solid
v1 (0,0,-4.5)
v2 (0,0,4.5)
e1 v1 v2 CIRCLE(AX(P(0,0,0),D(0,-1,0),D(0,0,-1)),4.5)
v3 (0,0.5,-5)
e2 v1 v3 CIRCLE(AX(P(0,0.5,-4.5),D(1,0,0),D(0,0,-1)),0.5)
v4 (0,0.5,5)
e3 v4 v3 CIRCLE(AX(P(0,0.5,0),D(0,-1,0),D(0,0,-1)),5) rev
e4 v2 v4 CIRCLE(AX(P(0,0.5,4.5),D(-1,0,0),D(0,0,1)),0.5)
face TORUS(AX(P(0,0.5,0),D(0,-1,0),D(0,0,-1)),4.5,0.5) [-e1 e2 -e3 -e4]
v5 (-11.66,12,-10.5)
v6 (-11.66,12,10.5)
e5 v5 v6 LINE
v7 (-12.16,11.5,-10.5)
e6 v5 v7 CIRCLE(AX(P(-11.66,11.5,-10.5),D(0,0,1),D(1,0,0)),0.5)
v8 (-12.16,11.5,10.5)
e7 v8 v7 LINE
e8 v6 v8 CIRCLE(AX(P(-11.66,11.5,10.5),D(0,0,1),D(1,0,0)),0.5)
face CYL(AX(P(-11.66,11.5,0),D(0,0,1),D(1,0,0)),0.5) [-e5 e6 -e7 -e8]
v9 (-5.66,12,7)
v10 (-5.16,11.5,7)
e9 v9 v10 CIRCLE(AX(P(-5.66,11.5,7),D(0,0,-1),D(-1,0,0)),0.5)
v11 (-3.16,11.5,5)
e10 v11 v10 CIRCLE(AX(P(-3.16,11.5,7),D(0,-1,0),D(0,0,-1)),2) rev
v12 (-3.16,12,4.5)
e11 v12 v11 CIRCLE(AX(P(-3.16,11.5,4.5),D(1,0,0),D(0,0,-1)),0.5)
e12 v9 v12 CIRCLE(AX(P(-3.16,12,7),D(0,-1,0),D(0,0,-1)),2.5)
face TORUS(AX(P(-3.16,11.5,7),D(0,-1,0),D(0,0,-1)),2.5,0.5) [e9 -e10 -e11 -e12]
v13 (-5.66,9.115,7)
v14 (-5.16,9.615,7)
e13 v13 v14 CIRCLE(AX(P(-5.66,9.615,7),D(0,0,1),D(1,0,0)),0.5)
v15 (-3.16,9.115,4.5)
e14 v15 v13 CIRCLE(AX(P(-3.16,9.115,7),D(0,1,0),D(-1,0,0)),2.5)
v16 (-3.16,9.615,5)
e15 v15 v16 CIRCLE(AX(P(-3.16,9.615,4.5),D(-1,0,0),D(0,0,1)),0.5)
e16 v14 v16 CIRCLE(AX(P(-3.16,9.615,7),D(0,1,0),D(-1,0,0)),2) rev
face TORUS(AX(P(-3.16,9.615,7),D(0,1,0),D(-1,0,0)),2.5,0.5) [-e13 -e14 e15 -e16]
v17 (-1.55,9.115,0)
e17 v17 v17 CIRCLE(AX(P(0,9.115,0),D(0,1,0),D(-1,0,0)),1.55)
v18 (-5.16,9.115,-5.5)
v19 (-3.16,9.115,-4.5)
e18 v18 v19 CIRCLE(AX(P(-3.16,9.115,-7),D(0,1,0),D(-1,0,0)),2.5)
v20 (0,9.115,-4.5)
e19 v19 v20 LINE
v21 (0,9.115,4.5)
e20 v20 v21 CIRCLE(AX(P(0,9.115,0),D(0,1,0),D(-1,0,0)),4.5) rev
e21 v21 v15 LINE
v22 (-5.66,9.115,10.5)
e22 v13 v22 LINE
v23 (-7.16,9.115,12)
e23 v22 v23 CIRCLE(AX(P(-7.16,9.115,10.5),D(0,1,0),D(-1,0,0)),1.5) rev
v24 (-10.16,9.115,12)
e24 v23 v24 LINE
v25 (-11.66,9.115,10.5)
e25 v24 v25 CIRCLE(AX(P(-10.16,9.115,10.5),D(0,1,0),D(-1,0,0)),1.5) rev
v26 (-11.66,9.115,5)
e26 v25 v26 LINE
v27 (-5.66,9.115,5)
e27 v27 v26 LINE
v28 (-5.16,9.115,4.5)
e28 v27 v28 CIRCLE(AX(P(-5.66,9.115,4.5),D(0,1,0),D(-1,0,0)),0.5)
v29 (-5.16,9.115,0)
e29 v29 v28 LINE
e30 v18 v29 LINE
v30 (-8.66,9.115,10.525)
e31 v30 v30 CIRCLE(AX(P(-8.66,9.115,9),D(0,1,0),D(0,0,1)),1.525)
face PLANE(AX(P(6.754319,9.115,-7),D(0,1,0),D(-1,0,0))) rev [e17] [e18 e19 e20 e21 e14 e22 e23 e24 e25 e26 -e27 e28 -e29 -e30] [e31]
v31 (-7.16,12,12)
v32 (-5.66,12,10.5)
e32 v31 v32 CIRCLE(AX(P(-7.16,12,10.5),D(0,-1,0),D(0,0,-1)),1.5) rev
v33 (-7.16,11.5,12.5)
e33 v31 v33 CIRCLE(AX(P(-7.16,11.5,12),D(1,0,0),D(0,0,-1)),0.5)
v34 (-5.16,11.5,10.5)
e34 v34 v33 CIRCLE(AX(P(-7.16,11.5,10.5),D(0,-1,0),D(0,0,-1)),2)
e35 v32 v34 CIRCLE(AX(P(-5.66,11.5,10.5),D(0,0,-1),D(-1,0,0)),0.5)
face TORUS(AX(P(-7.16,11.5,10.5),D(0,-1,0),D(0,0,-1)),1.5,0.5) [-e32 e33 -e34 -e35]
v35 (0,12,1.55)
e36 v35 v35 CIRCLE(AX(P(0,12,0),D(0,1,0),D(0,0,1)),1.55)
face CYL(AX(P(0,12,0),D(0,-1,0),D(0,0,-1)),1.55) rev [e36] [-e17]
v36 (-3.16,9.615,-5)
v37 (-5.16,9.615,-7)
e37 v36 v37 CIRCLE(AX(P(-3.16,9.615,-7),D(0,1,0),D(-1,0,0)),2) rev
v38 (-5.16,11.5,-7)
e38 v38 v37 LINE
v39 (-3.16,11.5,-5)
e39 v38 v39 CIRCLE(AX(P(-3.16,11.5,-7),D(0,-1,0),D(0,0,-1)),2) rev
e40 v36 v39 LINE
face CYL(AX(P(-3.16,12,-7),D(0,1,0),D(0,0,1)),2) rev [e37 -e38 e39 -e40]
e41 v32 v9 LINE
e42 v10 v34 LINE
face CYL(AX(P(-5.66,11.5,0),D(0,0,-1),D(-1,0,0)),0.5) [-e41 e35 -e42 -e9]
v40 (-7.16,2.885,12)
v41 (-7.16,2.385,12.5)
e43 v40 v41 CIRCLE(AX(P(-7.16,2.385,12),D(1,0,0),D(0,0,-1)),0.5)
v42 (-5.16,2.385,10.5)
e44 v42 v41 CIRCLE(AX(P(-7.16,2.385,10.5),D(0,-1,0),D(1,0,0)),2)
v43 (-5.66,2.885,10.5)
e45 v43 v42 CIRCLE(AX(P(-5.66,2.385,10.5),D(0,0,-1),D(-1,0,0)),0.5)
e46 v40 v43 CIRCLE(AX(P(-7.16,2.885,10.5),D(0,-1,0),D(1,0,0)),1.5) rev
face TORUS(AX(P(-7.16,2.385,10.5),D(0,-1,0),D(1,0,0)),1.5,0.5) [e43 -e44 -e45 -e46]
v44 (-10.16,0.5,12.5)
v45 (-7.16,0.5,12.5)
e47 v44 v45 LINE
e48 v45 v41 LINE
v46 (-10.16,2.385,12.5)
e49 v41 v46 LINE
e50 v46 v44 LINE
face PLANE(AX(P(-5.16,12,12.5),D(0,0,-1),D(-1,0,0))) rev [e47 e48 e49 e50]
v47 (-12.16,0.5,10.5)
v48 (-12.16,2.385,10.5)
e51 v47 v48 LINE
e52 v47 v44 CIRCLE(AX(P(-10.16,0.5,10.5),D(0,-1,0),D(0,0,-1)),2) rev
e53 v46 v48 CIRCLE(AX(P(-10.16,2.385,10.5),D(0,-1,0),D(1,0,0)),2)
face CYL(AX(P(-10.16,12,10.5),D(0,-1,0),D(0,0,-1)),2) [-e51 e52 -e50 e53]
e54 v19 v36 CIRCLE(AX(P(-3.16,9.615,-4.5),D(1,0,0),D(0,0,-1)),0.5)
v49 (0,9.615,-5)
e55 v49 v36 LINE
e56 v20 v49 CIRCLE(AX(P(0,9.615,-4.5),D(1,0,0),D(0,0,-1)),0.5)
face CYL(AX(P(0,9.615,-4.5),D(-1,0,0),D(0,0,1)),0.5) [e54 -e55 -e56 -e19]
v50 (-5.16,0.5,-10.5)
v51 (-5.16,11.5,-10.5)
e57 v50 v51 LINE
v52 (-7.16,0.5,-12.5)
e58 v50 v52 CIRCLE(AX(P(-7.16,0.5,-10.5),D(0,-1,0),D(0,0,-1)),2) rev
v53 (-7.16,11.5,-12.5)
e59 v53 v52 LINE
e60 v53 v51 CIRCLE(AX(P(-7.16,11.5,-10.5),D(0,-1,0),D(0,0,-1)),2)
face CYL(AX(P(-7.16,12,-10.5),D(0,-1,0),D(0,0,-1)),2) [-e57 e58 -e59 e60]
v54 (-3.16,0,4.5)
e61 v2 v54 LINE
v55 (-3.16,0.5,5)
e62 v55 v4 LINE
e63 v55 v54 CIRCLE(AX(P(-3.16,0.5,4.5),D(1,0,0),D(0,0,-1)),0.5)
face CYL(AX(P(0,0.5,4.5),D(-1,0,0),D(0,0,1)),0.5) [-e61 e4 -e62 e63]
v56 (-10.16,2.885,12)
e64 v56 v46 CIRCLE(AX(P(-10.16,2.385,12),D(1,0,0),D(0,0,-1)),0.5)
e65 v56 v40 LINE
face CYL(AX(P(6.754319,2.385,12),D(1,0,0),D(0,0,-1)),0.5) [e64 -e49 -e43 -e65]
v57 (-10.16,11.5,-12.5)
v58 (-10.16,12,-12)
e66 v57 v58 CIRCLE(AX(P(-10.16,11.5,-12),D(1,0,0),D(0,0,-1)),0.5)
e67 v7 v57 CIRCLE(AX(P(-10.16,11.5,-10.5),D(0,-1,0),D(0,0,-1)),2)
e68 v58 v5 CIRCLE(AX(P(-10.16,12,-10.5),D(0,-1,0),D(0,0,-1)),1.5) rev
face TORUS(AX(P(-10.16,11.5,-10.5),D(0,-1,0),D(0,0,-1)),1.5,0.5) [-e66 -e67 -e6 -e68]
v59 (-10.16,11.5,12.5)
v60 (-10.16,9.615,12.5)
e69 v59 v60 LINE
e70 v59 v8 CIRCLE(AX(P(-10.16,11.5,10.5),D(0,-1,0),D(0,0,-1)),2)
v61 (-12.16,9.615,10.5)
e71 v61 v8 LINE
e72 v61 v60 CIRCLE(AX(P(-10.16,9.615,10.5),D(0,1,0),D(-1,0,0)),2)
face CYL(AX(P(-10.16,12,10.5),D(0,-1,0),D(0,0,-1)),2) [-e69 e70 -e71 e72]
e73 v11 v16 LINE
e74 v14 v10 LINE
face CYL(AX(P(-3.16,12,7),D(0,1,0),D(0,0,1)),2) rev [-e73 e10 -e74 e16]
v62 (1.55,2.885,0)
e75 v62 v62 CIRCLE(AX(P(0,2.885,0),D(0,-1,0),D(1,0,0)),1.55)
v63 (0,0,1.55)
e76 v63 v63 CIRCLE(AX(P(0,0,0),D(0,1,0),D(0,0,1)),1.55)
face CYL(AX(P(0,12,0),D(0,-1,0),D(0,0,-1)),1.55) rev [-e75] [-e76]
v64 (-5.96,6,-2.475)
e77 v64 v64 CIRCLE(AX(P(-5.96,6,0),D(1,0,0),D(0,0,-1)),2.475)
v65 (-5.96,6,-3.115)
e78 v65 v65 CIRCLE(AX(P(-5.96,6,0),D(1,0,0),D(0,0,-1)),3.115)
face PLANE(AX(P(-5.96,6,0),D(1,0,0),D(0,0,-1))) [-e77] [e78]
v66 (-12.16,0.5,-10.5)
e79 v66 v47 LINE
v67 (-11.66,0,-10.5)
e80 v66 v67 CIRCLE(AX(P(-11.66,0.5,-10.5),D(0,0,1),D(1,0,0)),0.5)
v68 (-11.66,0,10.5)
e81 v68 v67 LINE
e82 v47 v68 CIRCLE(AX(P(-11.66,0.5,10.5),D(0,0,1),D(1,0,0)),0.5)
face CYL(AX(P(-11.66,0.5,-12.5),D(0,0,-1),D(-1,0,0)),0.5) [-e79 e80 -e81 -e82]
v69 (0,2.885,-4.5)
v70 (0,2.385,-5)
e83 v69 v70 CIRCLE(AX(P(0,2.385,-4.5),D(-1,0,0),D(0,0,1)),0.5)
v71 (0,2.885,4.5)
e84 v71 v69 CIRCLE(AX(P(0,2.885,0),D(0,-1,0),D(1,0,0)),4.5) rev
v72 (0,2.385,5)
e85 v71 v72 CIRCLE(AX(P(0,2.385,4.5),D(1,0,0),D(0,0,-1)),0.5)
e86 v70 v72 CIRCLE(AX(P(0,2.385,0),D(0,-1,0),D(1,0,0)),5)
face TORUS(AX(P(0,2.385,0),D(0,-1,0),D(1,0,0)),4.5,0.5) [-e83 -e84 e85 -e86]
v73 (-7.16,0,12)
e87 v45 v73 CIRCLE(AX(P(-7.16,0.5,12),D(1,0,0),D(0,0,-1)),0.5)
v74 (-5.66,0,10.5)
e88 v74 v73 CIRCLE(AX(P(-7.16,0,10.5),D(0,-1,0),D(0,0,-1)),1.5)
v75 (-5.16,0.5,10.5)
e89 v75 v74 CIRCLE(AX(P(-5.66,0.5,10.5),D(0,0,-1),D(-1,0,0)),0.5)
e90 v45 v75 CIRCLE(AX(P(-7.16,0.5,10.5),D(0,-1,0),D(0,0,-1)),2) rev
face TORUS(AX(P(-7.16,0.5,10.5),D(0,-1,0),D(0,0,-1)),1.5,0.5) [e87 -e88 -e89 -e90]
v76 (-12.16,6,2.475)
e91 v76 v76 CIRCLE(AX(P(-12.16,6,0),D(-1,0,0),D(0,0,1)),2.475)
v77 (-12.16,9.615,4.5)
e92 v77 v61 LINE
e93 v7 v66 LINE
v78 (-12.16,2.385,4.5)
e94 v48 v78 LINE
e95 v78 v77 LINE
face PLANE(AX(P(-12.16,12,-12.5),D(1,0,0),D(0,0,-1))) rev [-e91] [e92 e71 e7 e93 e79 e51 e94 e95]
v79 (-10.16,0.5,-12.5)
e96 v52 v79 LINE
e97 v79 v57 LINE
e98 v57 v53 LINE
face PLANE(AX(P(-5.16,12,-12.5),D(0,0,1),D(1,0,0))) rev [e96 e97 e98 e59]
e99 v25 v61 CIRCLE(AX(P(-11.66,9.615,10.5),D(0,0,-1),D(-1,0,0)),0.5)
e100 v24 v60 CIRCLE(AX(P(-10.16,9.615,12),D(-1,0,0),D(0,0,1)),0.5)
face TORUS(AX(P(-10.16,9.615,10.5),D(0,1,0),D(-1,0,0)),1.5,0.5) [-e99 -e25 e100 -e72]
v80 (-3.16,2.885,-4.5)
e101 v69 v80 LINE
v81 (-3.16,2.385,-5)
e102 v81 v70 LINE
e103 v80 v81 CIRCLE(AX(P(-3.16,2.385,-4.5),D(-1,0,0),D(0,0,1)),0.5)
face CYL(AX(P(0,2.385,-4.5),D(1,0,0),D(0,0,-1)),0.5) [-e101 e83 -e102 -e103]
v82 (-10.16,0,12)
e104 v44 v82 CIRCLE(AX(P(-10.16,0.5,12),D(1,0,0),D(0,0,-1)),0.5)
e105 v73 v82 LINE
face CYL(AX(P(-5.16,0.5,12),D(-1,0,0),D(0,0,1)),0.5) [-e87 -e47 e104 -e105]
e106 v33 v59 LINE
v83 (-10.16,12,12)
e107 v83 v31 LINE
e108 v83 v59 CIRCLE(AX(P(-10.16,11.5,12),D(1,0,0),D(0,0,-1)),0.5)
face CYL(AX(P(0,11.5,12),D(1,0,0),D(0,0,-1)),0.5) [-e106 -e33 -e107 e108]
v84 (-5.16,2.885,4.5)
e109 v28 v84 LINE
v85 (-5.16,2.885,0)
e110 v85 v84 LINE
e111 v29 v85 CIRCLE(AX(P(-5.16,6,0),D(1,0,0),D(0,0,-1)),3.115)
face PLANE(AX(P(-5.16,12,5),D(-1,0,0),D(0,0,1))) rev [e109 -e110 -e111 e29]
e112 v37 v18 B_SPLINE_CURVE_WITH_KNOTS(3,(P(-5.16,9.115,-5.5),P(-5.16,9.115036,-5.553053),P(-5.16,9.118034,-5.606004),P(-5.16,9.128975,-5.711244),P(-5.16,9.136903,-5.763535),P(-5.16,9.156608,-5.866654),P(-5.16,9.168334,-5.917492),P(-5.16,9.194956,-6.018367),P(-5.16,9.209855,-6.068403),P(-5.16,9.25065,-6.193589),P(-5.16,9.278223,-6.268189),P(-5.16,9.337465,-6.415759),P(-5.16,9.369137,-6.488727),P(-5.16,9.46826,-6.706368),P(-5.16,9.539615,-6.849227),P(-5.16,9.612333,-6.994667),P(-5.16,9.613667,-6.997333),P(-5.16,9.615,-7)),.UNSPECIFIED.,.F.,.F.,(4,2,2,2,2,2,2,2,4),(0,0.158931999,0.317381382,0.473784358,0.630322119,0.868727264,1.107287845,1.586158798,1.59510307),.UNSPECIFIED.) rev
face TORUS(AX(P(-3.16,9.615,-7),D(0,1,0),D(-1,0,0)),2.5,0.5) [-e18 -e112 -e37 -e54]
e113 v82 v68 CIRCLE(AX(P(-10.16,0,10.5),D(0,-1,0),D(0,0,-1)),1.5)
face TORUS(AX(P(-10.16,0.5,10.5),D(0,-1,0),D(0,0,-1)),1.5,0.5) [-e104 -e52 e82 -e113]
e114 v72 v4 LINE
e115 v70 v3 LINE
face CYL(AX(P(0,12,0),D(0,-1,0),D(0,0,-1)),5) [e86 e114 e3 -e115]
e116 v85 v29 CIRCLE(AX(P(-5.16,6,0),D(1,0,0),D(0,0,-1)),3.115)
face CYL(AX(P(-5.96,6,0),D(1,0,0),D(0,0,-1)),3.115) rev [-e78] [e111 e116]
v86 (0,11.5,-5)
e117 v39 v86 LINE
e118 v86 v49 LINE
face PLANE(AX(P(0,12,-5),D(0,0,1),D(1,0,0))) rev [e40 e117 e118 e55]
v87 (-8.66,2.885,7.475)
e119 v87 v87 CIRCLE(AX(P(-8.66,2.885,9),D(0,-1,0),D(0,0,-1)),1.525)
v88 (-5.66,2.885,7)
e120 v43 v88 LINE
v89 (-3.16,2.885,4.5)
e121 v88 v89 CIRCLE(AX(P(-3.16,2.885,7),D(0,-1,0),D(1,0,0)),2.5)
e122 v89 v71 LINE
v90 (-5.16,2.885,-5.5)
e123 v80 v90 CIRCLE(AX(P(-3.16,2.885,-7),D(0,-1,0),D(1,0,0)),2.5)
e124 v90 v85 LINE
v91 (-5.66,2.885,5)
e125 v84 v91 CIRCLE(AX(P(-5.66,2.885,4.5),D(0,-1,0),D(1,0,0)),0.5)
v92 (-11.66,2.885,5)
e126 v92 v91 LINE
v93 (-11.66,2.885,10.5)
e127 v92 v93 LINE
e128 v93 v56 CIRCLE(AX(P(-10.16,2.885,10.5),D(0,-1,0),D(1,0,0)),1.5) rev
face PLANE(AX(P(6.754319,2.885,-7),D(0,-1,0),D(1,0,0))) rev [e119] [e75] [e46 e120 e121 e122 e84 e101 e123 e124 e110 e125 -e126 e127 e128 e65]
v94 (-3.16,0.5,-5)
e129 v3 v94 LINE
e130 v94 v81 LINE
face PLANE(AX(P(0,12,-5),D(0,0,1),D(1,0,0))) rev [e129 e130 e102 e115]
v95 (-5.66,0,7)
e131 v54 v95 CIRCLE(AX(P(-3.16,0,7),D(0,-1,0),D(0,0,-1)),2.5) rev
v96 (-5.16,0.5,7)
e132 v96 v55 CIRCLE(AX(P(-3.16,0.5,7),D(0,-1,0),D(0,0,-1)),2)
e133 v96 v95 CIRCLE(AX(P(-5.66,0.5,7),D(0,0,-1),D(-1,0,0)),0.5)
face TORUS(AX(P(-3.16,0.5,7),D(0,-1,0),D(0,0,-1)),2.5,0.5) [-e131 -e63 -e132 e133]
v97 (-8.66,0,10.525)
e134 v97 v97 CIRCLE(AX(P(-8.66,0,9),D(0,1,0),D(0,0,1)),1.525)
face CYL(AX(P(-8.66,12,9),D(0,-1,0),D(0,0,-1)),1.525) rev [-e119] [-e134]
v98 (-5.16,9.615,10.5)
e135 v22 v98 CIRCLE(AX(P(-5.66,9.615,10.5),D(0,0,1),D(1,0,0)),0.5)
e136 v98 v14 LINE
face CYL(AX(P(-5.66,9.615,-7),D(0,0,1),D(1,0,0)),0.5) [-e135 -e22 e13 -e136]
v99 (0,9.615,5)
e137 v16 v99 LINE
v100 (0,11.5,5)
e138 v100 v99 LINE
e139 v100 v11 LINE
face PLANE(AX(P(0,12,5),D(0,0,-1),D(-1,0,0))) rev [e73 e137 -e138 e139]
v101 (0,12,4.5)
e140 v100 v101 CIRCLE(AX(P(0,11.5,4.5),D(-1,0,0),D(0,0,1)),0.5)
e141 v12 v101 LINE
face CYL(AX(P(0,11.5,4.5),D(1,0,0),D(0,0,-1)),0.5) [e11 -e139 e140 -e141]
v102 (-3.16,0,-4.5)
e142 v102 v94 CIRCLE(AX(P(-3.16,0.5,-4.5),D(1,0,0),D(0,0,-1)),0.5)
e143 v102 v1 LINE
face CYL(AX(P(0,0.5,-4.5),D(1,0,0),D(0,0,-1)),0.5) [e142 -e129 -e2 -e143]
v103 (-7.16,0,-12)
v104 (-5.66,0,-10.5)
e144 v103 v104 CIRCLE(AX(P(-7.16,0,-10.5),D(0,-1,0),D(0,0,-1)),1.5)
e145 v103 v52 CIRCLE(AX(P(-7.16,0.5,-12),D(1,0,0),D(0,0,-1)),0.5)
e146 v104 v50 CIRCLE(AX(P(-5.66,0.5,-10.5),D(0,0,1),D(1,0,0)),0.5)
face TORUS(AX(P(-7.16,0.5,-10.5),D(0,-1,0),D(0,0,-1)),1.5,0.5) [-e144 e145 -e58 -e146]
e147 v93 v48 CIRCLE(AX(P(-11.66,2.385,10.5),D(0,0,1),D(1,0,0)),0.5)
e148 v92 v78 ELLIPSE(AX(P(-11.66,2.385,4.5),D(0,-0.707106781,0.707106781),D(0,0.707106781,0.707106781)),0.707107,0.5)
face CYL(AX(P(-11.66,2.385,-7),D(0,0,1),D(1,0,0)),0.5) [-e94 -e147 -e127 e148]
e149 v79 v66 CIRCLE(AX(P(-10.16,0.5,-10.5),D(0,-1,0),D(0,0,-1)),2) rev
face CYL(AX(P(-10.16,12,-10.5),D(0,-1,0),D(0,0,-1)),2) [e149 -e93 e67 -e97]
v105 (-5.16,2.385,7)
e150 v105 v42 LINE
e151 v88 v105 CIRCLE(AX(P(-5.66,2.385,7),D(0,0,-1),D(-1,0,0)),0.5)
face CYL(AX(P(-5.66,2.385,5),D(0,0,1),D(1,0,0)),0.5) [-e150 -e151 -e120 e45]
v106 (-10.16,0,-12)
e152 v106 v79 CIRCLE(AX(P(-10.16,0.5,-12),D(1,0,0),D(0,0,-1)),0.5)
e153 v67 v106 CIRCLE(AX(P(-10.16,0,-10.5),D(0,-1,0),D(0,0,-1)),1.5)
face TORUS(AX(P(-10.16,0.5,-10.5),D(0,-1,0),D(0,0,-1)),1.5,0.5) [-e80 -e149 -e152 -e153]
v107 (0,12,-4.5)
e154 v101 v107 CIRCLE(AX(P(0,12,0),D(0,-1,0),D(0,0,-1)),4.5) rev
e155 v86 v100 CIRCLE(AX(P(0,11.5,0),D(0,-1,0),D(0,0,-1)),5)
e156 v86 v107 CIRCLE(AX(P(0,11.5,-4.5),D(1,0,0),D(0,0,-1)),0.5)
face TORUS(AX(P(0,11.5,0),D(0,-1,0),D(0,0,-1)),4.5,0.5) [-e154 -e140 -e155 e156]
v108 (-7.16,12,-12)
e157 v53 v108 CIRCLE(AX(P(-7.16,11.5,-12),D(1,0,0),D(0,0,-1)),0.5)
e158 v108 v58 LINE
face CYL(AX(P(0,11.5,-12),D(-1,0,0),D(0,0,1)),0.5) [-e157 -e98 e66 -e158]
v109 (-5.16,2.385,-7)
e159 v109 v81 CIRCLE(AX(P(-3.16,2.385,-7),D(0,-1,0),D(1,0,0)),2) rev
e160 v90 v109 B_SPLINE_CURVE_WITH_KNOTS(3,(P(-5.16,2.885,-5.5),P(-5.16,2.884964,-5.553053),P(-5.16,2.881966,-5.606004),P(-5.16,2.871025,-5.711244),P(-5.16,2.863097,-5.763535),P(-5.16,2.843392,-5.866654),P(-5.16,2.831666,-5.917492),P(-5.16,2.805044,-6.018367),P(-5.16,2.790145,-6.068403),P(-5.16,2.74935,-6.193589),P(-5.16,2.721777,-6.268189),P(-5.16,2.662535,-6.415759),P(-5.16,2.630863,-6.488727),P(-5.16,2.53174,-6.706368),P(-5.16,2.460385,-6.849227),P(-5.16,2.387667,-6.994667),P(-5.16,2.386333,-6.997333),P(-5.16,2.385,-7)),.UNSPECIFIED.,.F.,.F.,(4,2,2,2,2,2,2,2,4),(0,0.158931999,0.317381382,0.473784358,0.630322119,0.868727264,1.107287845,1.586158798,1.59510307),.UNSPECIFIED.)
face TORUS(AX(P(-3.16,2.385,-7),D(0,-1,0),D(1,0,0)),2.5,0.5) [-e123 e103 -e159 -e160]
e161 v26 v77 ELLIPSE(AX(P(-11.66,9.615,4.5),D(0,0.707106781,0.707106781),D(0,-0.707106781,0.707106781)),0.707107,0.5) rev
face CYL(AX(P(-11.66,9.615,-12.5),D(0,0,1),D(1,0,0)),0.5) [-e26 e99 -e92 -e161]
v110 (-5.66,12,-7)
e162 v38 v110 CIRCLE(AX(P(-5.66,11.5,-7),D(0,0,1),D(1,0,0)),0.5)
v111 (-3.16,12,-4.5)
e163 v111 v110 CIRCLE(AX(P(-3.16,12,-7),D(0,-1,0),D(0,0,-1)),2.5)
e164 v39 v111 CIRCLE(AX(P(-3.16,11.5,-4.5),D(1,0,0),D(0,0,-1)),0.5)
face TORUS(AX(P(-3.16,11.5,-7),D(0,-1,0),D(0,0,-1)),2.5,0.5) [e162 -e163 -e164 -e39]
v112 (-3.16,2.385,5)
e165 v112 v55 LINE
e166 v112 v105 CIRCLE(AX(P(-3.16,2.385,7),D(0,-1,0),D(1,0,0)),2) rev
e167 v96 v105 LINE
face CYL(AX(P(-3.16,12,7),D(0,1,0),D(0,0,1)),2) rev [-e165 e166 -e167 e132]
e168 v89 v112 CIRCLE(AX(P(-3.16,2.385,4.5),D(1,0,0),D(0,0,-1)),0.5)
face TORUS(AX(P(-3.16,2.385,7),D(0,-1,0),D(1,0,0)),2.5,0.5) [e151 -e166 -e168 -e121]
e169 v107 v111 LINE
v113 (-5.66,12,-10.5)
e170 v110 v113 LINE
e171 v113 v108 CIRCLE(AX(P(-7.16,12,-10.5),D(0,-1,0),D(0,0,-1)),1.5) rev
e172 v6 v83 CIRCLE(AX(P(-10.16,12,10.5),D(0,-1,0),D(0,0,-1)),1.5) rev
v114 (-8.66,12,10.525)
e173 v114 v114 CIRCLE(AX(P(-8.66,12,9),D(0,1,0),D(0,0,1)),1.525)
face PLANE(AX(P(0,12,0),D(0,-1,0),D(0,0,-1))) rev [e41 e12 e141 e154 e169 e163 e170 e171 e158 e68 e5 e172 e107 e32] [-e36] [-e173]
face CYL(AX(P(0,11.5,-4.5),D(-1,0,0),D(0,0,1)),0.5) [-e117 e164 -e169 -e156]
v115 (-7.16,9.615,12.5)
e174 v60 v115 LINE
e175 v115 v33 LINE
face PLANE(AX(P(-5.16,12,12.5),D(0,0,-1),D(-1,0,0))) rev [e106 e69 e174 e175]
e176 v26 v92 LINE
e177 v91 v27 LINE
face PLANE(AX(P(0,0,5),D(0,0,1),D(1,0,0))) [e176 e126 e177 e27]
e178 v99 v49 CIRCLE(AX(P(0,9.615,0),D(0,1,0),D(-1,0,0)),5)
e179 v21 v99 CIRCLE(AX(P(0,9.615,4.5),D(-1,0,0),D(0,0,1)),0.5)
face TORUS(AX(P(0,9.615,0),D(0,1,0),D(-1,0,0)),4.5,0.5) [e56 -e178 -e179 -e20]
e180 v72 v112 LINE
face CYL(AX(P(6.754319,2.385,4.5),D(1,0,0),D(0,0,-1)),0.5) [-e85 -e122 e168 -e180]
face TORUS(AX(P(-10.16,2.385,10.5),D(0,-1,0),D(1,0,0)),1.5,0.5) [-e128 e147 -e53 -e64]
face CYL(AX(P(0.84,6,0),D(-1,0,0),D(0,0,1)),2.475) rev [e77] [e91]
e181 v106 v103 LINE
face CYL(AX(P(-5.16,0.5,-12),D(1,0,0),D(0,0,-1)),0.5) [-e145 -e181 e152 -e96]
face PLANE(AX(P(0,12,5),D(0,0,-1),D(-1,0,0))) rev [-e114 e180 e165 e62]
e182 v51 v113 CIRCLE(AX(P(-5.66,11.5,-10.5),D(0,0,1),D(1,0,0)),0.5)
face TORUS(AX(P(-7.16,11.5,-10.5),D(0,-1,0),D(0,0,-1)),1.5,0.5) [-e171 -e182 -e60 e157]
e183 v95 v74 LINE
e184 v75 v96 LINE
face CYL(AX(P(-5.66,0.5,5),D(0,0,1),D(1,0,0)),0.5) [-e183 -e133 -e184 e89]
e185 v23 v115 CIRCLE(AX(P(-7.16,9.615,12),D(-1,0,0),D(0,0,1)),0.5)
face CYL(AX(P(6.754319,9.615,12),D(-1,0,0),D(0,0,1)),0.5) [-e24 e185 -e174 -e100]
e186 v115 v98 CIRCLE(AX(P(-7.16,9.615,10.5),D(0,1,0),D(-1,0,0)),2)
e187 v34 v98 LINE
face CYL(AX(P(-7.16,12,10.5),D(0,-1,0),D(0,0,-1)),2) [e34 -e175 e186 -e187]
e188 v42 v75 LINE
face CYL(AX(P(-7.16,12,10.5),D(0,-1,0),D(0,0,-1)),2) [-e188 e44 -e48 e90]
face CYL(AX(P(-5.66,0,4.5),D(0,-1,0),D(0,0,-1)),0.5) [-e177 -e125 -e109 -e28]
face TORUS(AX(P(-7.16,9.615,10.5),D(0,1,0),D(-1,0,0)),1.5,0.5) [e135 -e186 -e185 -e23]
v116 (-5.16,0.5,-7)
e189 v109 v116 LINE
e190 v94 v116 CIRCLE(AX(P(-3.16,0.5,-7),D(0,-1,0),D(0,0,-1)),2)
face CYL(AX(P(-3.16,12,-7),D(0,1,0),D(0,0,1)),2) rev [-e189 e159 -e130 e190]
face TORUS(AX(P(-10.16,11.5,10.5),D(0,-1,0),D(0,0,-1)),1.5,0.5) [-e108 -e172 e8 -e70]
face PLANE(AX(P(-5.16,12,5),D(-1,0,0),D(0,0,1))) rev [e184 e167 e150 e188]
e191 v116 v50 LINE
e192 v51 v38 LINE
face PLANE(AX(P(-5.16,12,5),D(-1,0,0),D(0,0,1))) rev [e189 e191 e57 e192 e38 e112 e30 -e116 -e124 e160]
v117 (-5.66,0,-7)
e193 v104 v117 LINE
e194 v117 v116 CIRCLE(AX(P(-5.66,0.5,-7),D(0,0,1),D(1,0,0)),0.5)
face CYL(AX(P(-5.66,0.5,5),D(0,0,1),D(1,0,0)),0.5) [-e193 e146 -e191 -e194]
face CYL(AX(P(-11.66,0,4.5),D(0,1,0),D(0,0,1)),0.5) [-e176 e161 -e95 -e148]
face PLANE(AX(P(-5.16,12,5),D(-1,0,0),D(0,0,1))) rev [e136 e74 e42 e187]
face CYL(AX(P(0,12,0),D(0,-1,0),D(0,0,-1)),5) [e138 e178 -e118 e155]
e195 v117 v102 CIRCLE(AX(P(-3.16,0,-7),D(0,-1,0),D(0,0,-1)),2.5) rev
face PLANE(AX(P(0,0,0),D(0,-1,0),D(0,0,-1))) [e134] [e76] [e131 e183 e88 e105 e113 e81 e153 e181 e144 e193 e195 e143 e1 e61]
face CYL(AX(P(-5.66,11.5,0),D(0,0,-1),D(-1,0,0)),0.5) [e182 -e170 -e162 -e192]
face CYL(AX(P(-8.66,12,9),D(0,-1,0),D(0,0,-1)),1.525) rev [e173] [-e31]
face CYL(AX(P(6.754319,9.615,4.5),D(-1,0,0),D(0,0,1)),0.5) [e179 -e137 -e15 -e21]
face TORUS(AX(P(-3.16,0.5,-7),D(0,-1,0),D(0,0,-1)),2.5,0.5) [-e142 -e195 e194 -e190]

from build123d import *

# Parameters (mm, degrees)
SKETCH2_R           = 1.55
SKETCH2_R_2         = 1.525
BOSS_EXTRUDE1_DEPTH = 12
SKETCH3_W           = 11.91431853
SKETCH3_H           = 6.23
CUT_EXTRUDE1_DEPTH  = 12
FILLET2_R           = 2
SKETCH5_R           = 2.475
CUT_EXTRUDE3_DEPTH  = 13
SKETCH6_W           = 7
SKETCH6_H           = 6.23
CUT_EXTRUDE4_DEPTH  = 7.5
FILLET3_R           = 2
CUT_EXTRUDE5_START  = -0.8
SKETCH8_R           = 3.115
SKETCH8_R_2         = 2.475
CUT_EXTRUDE5_DEPTH  = 0.8
FILLET8_R           = 0.5


with BuildPart() as part:
    # Sketch2 → Boss-Extrude1 (new body)
    with BuildSketch(Plane(origin=(0, 0, 0), x_dir=(1, 0, 0), z_dir=(0, 1, 0))):
        with BuildLine():
            Line((-5.16, -5), (-5.16, -12.5))
            Line((-5.16, -12.5), (-12.16, -12.5))
            Line((-12.16, -12.5), (-12.16, 12.5))
            Line((-12.16, 12.5), (-5.16, 12.5))
            Line((-5.16, 12.5), (-5.16, 5))
            Line((-5.16, 5), (0, 5))
            ThreePointArc((0, 5), (5, 0), (0, -5))
            Line((0, -5), (-5.16, -5))
        make_face()
        with Locations(Location((0, 0, 0), (0, 0, 270))):
            Circle(SKETCH2_R, mode=Mode.SUBTRACT)
        with Locations(Location((-8.66, -9, 0), (0, 0, 270))):
            Circle(SKETCH2_R_2, mode=Mode.SUBTRACT)
    extrude(amount=BOSS_EXTRUDE1_DEPTH)

    # Sketch3 → Cut-Extrude1 (cut)
    with BuildSketch(Plane.XY.offset(5)):
        with Locations((0.797159265, 6)):
            Rectangle(SKETCH3_W, SKETCH3_H)
    extrude(amount=-CUT_EXTRUDE1_DEPTH, mode=Mode.SUBTRACT)

    # Fillet2
    fillet2_edges = [part.edges().sort_by_distance(p)[0] for p in [
        (-5.16, 10.5575, 5),
        (-5.16, 10.5575, -5),
        (-5.16, 1.4425, 5),
        (-5.16, 1.4425, -5),
    ]]
    fillet(fillet2_edges, radius=FILLET2_R)

    # Sketch5 → Cut-Extrude3 (cut)
    with BuildSketch(Plane.ZY.offset(12.16)):
        with Locations((0, 6)):
            Circle(SKETCH5_R)
    extrude(amount=-CUT_EXTRUDE3_DEPTH, mode=Mode.SUBTRACT)

    # Sketch6 → Cut-Extrude4 (cut)
    with BuildSketch(Plane.XY.offset(12.5)):
        with Locations((-8.66, 6)):
            Rectangle(SKETCH6_W, SKETCH6_H)
    extrude(amount=-CUT_EXTRUDE4_DEPTH, mode=Mode.SUBTRACT)

    # Fillet3
    fillet3_edges = [part.edges().sort_by_distance(p)[0] for p in [
        (-5.16, 1.4425, 12.5),
        (-12.16, 1.4425, 12.5),
        (-5.16, 10.5575, 12.5),
        (-12.16, 10.5575, 12.5),
        (-12.16, 6, -12.5),
        (-5.16, 6, -12.5),
    ]]
    fillet(fillet3_edges, radius=FILLET3_R)

    # Sketch8 → Cut-Extrude5 (cut)
    with BuildSketch(Plane(origin=(-5.16, 0, 0), x_dir=(0, 0, -1), z_dir=(1, 0, 0)).offset(CUT_EXTRUDE5_START)):
        with Locations((0, 6)):
            Circle(SKETCH8_R)
        with Locations(Location((0, 6, 0), (0, 0, 180))):
            Circle(SKETCH8_R_2, mode=Mode.SUBTRACT)
    extrude(amount=CUT_EXTRUDE5_DEPTH, mode=Mode.SUBTRACT)

    # Fillet8
    # the kernel refuses this fillet: 0.5 mm, written as the material it takes off along each edge
    with BuildSketch(Plane(origin=(-3.16, 0, -5), x_dir=(0, 0, 1), z_dir=(1, 0, 0)), Plane(origin=(-3.16, 2.885, -5), x_dir=(0, -1, 0), z_dir=(1, 0, 0)), Plane(origin=(0, 2.885, 5), x_dir=(0, -1, 0), z_dir=(-1, 0, 0)), Plane(origin=(0, 0, 5), x_dir=(0, 0, -1), z_dir=(-1, 0, 0))) as fillet8_piece_1:
        with BuildLine():
            CenterArc((FILLET8_R, -FILLET8_R), FILLET8_R, 90, 90)
            Line((0, -FILLET8_R), (0, 0))
            Line((0, 0), (FILLET8_R, 0))
        make_face()
    extrude(amount=3.16, mode=Mode.SUBTRACT)
    with BuildSketch(Plane(origin=(0, 0, 0), x_dir=(0, 0, -1), z_dir=(-1, 0, 0))) as fillet8_piece_2:
        with BuildLine():
            CenterArc((5 - FILLET8_R, -FILLET8_R), FILLET8_R, 0, 90)
            Line((5, -FILLET8_R), (5, 0))
            Line((5, 0), (5 - FILLET8_R, 0))
        make_face()
    revolve(axis=Axis((0, 0, 0), (0, -1, 0)), revolution_arc=180, mode=Mode.SUBTRACT)
    with BuildSketch(Plane(origin=(-12.16, 2.885, 5), x_dir=(0, 0, -1), z_dir=(0, 1, 0))) as fillet8_piece_3:
        with BuildLine():
            CenterArc((FILLET8_R, -FILLET8_R), FILLET8_R, 90, 90)
            Line((0, -FILLET8_R), (0, 0))
            Line((0, 0), (FILLET8_R, 0))
        make_face()
    extrude(amount=6.23, mode=Mode.SUBTRACT)
    with BuildSketch(Plane(origin=(-12.16, 2.885, 10.5), x_dir=(0, -1, 0), z_dir=(0, 0, -1))) as fillet8_piece_4:
        with BuildLine():
            CenterArc((FILLET8_R, -FILLET8_R), FILLET8_R, 90, 90)
            Line((0, -FILLET8_R), (0, 0))
            Line((0, 0), (FILLET8_R, 0))
        make_face()
    extrude(amount=5.5, mode=Mode.SUBTRACT)
    with BuildSketch(Plane(origin=(-12.16, 9.115, 10.5), x_dir=(0, 1, 0), z_dir=(0, 0, -1))) as fillet8_piece_5:
        with BuildLine():
            CenterArc((FILLET8_R, FILLET8_R), FILLET8_R, 180, 90)
            Line((0, FILLET8_R), (0, 0))
            Line((0, 0), (FILLET8_R, 0))
        make_face()
    extrude(amount=5.5, mode=Mode.SUBTRACT)
    with BuildSketch(Plane(origin=(-5.16, 9.115, 5), x_dir=(-1, 0, 0), z_dir=(0, -1, 0))) as fillet8_piece_6:
        with BuildLine():
            CenterArc((FILLET8_R, FILLET8_R), FILLET8_R, 180, 90)
            Line((0, FILLET8_R), (0, 0))
            Line((0, 0), (FILLET8_R, 0))
        make_face()
    extrude(amount=6.23, mode=Mode.SUBTRACT)
    with BuildSketch(Plane(origin=(-5.16, 9.115, 10.5), x_dir=(-1, 0, 0), z_dir=(0, 0, -1)), Plane(origin=(-5.16, 2.885, 10.5), x_dir=(0, -1, 0), z_dir=(0, 0, -1)), Plane(origin=(-5.16, 12, 7), x_dir=(-1, 0, 0), z_dir=(0, 0, 1))) as fillet8_piece_7:
        with BuildLine():
            CenterArc((FILLET8_R, FILLET8_R), FILLET8_R, 180, 90)
            Line((0, FILLET8_R), (0, 0))
            Line((0, 0), (FILLET8_R, 0))
        make_face()
    extrude(amount=3.5, mode=Mode.SUBTRACT)
    with BuildSketch(Plane(origin=(-12.16, 12, 10.5), x_dir=(0, -1, 0), z_dir=(0, 0, -1)), Plane(origin=(-12.16, 0, 10.5), x_dir=(1, 0, 0), z_dir=(0, 0, -1))) as fillet8_piece_8:
        with BuildLine():
            CenterArc((FILLET8_R, -FILLET8_R), FILLET8_R, 90, 90)
            Line((0, -FILLET8_R), (0, 0))
            Line((0, 0), (FILLET8_R, 0))
        make_face()
    extrude(amount=21, mode=Mode.SUBTRACT)
    with BuildSketch(Plane(origin=(-5.16, 0, 7), x_dir=(-1, 0, 0), z_dir=(0, 0, 1)), Plane(origin=(-5.16, 0, -10.5), x_dir=(-1, 0, 0), z_dir=(0, 0, 1)), Plane(origin=(-5.16, 12, -10.5), x_dir=(0, -1, 0), z_dir=(0, 0, 1))) as fillet8_piece_9:
        with BuildLine():
            CenterArc((FILLET8_R, -FILLET8_R), FILLET8_R, 90, 90)
            Line((0, -FILLET8_R), (0, 0))
            Line((0, 0), (FILLET8_R, 0))
        make_face()
    extrude(amount=3.5, mode=Mode.SUBTRACT)
    with BuildSketch(Plane(origin=(-7.16, 0, 12.5), x_dir=(0, 0, -1), z_dir=(-1, 0, 0)), Plane(origin=(-10.16, 0, -12.5), x_dir=(0, 0, 1), z_dir=(1, 0, 0)), Plane(origin=(-10.16, 12, -12.5), x_dir=(0, -1, 0), z_dir=(1, 0, 0)), Plane(origin=(-7.16, 2.885, 12.5), x_dir=(0, -1, 0), z_dir=(-1, 0, 0))) as fillet8_piece_10:
        with BuildLine():
            CenterArc((FILLET8_R, -FILLET8_R), FILLET8_R, 90, 90)
            Line((0, -FILLET8_R), (0, 0))
            Line((0, 0), (FILLET8_R, 0))
        make_face()
    extrude(amount=3, mode=Mode.SUBTRACT)
    with BuildSketch(Plane(origin=(-10.16, 0, 10.5), x_dir=(0, 0, 1), z_dir=(1, 0, 0))) as fillet8_piece_11:
        with BuildLine():
            CenterArc((2 - FILLET8_R, -FILLET8_R), FILLET8_R, 0, 90)
            Line((2, -FILLET8_R), (2, 0))
            Line((2, 0), (2 - FILLET8_R, 0))
        make_face()
    revolve(axis=Axis((-10.16, 0, 10.5), (0, -1, 0)), revolution_arc=90, mode=Mode.SUBTRACT)
    with BuildSketch(Plane(origin=(-7.16, 0, 10.5), x_dir=(1, 0, 0), z_dir=(0, 0, -1))) as fillet8_piece_12:
        with BuildLine():
            CenterArc((2 - FILLET8_R, -FILLET8_R), FILLET8_R, 0, 90)
            Line((2, -FILLET8_R), (2, 0))
            Line((2, 0), (2 - FILLET8_R, 0))
        make_face()
    revolve(axis=Axis((-7.16, 0, 10.5), (0, -1, 0)), revolution_arc=90, mode=Mode.SUBTRACT)
    with BuildSketch(Plane(origin=(-7.16, 0, -10.5), x_dir=(1, 0, 0), z_dir=(0, 0, 1))) as fillet8_piece_13:
        with BuildLine():
            CenterArc((2 - FILLET8_R, FILLET8_R), FILLET8_R, 270, 90)
            Line((2, FILLET8_R), (2, 0))
            Line((2, 0), (2 - FILLET8_R, 0))
        make_face()
    revolve(axis=Axis((-7.16, 0, -10.5), (0, 1, 0)), revolution_arc=90, mode=Mode.SUBTRACT)
    with BuildSketch(Plane(origin=(-10.16, 0, -10.5), x_dir=(-1, 0, 0), z_dir=(0, 0, 1))) as fillet8_piece_14:
        with BuildLine():
            CenterArc((2 - FILLET8_R, -FILLET8_R), FILLET8_R, 0, 90)
            Line((2, -FILLET8_R), (2, 0))
            Line((2, 0), (2 - FILLET8_R, 0))
        make_face()
    revolve(axis=Axis((-10.16, 0, -10.5), (0, -1, 0)), revolution_arc=90, mode=Mode.SUBTRACT)
    with BuildSketch(Plane(origin=(-7.16, 12, 12.5), x_dir=(0, 0, -1), z_dir=(-1, 0, 0)), Plane(origin=(-10.16, 9.115, 12.5), x_dir=(0, 0, -1), z_dir=(1, 0, 0))) as fillet8_piece_15:
        with BuildLine():
            CenterArc((FILLET8_R, FILLET8_R), FILLET8_R, 180, 90)
            Line((0, FILLET8_R), (0, 0))
            Line((0, 0), (FILLET8_R, 0))
        make_face()
    extrude(amount=3, mode=Mode.SUBTRACT)
    with BuildSketch(Plane(origin=(-7.16, 12, 10.5), x_dir=(0, 0, 1), z_dir=(-1, 0, 0))) as fillet8_piece_16:
        with BuildLine():
            CenterArc((2 - FILLET8_R, -FILLET8_R), FILLET8_R, 0, 90)
            Line((2, -FILLET8_R), (2, 0))
            Line((2, 0), (2 - FILLET8_R, 0))
        make_face()
    revolve(axis=Axis((-7.16, 12, 10.5), (0, 1, 0)), revolution_arc=90, mode=Mode.SUBTRACT)
    with BuildSketch(Plane(origin=(-10.16, 12, 10.5), x_dir=(-1, 0, 0), z_dir=(0, 0, -1))) as fillet8_piece_17:
        with BuildLine():
            CenterArc((2 - FILLET8_R, -FILLET8_R), FILLET8_R, 0, 90)
            Line((2, -FILLET8_R), (2, 0))
            Line((2, 0), (2 - FILLET8_R, 0))
        make_face()
    revolve(axis=Axis((-10.16, 12, 10.5), (0, 1, 0)), revolution_arc=90, mode=Mode.SUBTRACT)
    with BuildSketch(Plane(origin=(-7.16, 12, -10.5), x_dir=(1, 0, 0), z_dir=(0, 0, 1))) as fillet8_piece_18:
        with BuildLine():
            CenterArc((2 - FILLET8_R, -FILLET8_R), FILLET8_R, 0, 90)
            Line((2 - FILLET8_R, 0), (2, 0))
            Line((2, 0), (2, -FILLET8_R))
        make_face()
    revolve(axis=Axis((-7.16, 12, -10.5), (0, 1, 0)), revolution_arc=90, mode=Mode.SUBTRACT)
    with BuildSketch(Plane(origin=(-10.16, 12, -10.5), x_dir=(-1, 0, 0), z_dir=(0, 0, 1))) as fillet8_piece_19:
        with BuildLine():
            CenterArc((2 - FILLET8_R, FILLET8_R), FILLET8_R, 270, 90)
            Line((2 - FILLET8_R, 0), (2, 0))
            Line((2, 0), (2, FILLET8_R))
        make_face()
    revolve(axis=Axis((-10.16, 12, -10.5), (0, -1, 0)), revolution_arc=90, mode=Mode.SUBTRACT)
    with BuildSketch(Plane(origin=(-7.16, 9.115, 10.5), x_dir=(0, 0, 1), z_dir=(-1, 0, 0))) as fillet8_piece_20:
        with BuildLine():
            CenterArc((2 - FILLET8_R, FILLET8_R), FILLET8_R, 270, 90)
            Line((2, FILLET8_R), (2, 0))
            Line((2, 0), (2 - FILLET8_R, 0))
        make_face()
    revolve(axis=Axis((-7.16, 9.115, 10.5), (0, 1, 0)), revolution_arc=90, mode=Mode.SUBTRACT)
    with BuildSketch(Plane(origin=(-10.16, 9.115, 10.5), x_dir=(-1, 0, 0), z_dir=(0, 0, -1))) as fillet8_piece_21:
        with BuildLine():
            CenterArc((2 - FILLET8_R, FILLET8_R), FILLET8_R, 270, 90)
            Line((2 - FILLET8_R, 0), (2, 0))
            Line((2, 0), (2, FILLET8_R))
        make_face()
    revolve(axis=Axis((-10.16, 9.115, 10.5), (0, 1, 0)), revolution_arc=90, mode=Mode.SUBTRACT)
    with BuildSketch(Plane(origin=(-10.16, 2.885, 10.5), x_dir=(0, 0, 1), z_dir=(1, 0, 0))) as fillet8_piece_22:
        with BuildLine():
            CenterArc((2 - FILLET8_R, FILLET8_R), FILLET8_R, 270, 90)
            Line((2 - FILLET8_R, 0), (2, 0))
            Line((2, 0), (2, FILLET8_R))
        make_face()
    revolve(axis=Axis((-10.16, 2.885, 10.5), (0, -1, 0)), revolution_arc=90, mode=Mode.SUBTRACT)
    with BuildSketch(Plane(origin=(-7.16, 2.885, 10.5), x_dir=(1, 0, 0), z_dir=(0, 0, -1))) as fillet8_piece_23:
        with BuildLine():
            CenterArc((2 - FILLET8_R, FILLET8_R), FILLET8_R, 270, 90)
            Line((2 - FILLET8_R, 0), (2, 0))
            Line((2, 0), (2, FILLET8_R))
        make_face()
    revolve(axis=Axis((-7.16, 2.885, 10.5), (0, -1, 0)), revolution_arc=90, mode=Mode.SUBTRACT)
    with BuildSketch(Plane(origin=(0, 2.885, 0), x_dir=(0, 0, -1), z_dir=(-1, 0, 0))) as fillet8_piece_24:
        with BuildLine():
            CenterArc((5 - FILLET8_R, FILLET8_R), FILLET8_R, 270, 90)
            Line((5 - FILLET8_R, 0), (5, 0))
            Line((5, 0), (5, FILLET8_R))
        make_face()
    revolve(axis=Axis((0, 2.885, 0), (0, -1, 0)), revolution_arc=180, mode=Mode.SUBTRACT)
    with BuildSketch(Plane(origin=(0, 9.115, 0), x_dir=(0, 0, -1), z_dir=(-1, 0, 0))) as fillet8_piece_25:
        with BuildLine():
            CenterArc((5 - FILLET8_R, -FILLET8_R), FILLET8_R, 0, 90)
            Line((5, -FILLET8_R), (5, 0))
            Line((5, 0), (5 - FILLET8_R, 0))
        make_face()
    revolve(axis=Axis((0, 9.115, 0), (0, -1, 0)), revolution_arc=180, mode=Mode.SUBTRACT)
    with BuildSketch(Plane(origin=(0, 9.115, -5), x_dir=(0, 0, 1), z_dir=(-1, 0, 0)), Plane(origin=(-3.16, 9.115, 5), x_dir=(0, 0, -1), z_dir=(1, 0, 0)), Plane(origin=(0, 12, 5), x_dir=(0, 0, -1), z_dir=(-1, 0, 0)), Plane(origin=(-3.16, 12, -5), x_dir=(0, 0, 1), z_dir=(1, 0, 0))) as fillet8_piece_26:
        with BuildLine():
            CenterArc((FILLET8_R, FILLET8_R), FILLET8_R, 180, 90)
            Line((0, FILLET8_R), (0, 0))
            Line((0, 0), (FILLET8_R, 0))
        make_face()
    extrude(amount=3.16, mode=Mode.SUBTRACT)
    with BuildSketch(Plane(origin=(0, 12, 0), x_dir=(0, 0, -1), z_dir=(-1, 0, 0))) as fillet8_piece_27:
        with BuildLine():
            CenterArc((5 - FILLET8_R, FILLET8_R), FILLET8_R, 270, 90)
            Line((5, FILLET8_R), (5, 0))
            Line((5, 0), (5 - FILLET8_R, 0))
        make_face()
    revolve(axis=Axis((0, 12, 0), (0, -1, 0)), revolution_arc=180, mode=Mode.SUBTRACT)
    with BuildSketch(Plane(origin=(-3.16, 9.115, -7), x_dir=(-0.48631676857152506, 0, -0.87378258199975), z_dir=(0.87378258199975, 0, -0.48631676857152506))) as fillet8_piece_28_section:
        with BuildLine():
            CenterArc((2 + FILLET8_R, FILLET8_R), FILLET8_R, 180, 90)
            Line((2, FILLET8_R), (2, 0))
            Line((2, 0), (2 + FILLET8_R, 0))
        make_face()
    fillet8_piece_28 = revolve(axis=Axis((-3.16, 9.115, -7), (0, 1, 0)), revolution_arc=150.901220426, mode=Mode.PRIVATE)
    fillet8_piece_28 = split(fillet8_piece_28, bisect_by=Plane(origin=(-5.16, 9.115, -7), z_dir=(1, 0, 0)), keep=Keep.TOP, mode=Mode.PRIVATE)
    add(fillet8_piece_28, mode=Mode.SUBTRACT)
    with BuildSketch(Plane(origin=(-3.16, 12, -7), x_dir=(-1, 0, 0), z_dir=(0, 0, -1))) as fillet8_piece_29:
        with BuildLine():
            CenterArc((2 + FILLET8_R, -FILLET8_R), FILLET8_R, 90, 90)
            Line((2, -FILLET8_R), (2, 0))
            Line((2, 0), (2 + FILLET8_R, 0))
        make_face()
    revolve(axis=Axis((-3.16, 12, -7), (0, 1, 0)), revolution_arc=90, mode=Mode.SUBTRACT)
    with BuildSketch(Plane(origin=(-3.16, 0, -7), x_dir=(-1, 0, 0), z_dir=(0, 0, -1))) as fillet8_piece_30:
        with BuildLine():
            CenterArc((2 + FILLET8_R, FILLET8_R), FILLET8_R, 180, 90)
            Line((2, FILLET8_R), (2, 0))
            Line((2, 0), (2 + FILLET8_R, 0))
        make_face()
    revolve(axis=Axis((-3.16, 0, -7), (0, 1, 0)), revolution_arc=90, mode=Mode.SUBTRACT)
    with BuildSketch(Plane(origin=(-3.16, 2.885, -7), x_dir=(-0.48631676857152506, 0, -0.87378258199975), z_dir=(0.87378258199975, 0, -0.48631676857152506))) as fillet8_piece_31_section:
        with BuildLine():
            CenterArc((2 + FILLET8_R, -FILLET8_R), FILLET8_R, 90, 90)
            Line((2 + FILLET8_R, 0), (2, 0))
            Line((2, 0), (2, -FILLET8_R))
        make_face()
    fillet8_piece_31 = revolve(axis=Axis((-3.16, 2.885, -7), (0, 1, 0)), revolution_arc=150.901220426, mode=Mode.PRIVATE)
    fillet8_piece_31 = split(fillet8_piece_31, bisect_by=Plane(origin=(-5.16, 2.885, -7), z_dir=(1, 0, 0)), keep=Keep.TOP, mode=Mode.PRIVATE)
    add(fillet8_piece_31, mode=Mode.SUBTRACT)
    with BuildSketch(Plane(origin=(-3.16, 9.115, 7), x_dir=(-1, 0, 0), z_dir=(0, 0, 1))) as fillet8_piece_32:
        with BuildLine():
            CenterArc((2 + FILLET8_R, -FILLET8_R), FILLET8_R, 90, 90)
            Line((2, -FILLET8_R), (2, 0))
            Line((2, 0), (2 + FILLET8_R, 0))
        make_face()
    revolve(axis=Axis((-3.16, 9.115, 7), (0, -1, 0)), revolution_arc=90, mode=Mode.SUBTRACT)
    with BuildSketch(Plane(origin=(-3.16, 12, 7), x_dir=(-1, 0, 0), z_dir=(0, 0, 1))) as fillet8_piece_33:
        with BuildLine():
            CenterArc((2 + FILLET8_R, FILLET8_R), FILLET8_R, 180, 90)
            Line((2, FILLET8_R), (2, 0))
            Line((2, 0), (2 + FILLET8_R, 0))
        make_face()
    revolve(axis=Axis((-3.16, 12, 7), (0, -1, 0)), revolution_arc=90, mode=Mode.SUBTRACT)
    with BuildSketch(Plane(origin=(-3.16, 0, 7), x_dir=(0, 0, -1), z_dir=(1, 0, 0))) as fillet8_piece_34:
        with BuildLine():
            CenterArc((2 + FILLET8_R, FILLET8_R), FILLET8_R, 180, 90)
            Line((2, FILLET8_R), (2, 0))
            Line((2, 0), (2 + FILLET8_R, 0))
        make_face()
    revolve(axis=Axis((-3.16, 0, 7), (0, 1, 0)), revolution_arc=90, mode=Mode.SUBTRACT)
    with BuildSketch(Plane(origin=(-3.16, 2.885, 7), x_dir=(0, 0, -1), z_dir=(1, 0, 0))) as fillet8_piece_35:
        with BuildLine():
            CenterArc((2 + FILLET8_R, -FILLET8_R), FILLET8_R, 90, 90)
            Line((2 + FILLET8_R, 0), (2, 0))
            Line((2, 0), (2, -FILLET8_R))
        make_face()
    revolve(axis=Axis((-3.16, 2.885, 7), (0, 1, 0)), revolution_arc=90, mode=Mode.SUBTRACT)
    with BuildSketch(Plane(origin=(-12.16, 2.885, 10.5), x_dir=(0, -1, 0), z_dir=(0, 0, -1))) as fillet8_piece_36a_section:
        with BuildLine():
            CenterArc((FILLET8_R, -FILLET8_R), FILLET8_R, 90, 90)
            Line((0, -FILLET8_R), (0, 0))
            Line((0, 0), (FILLET8_R, 0))
        make_face()
    fillet8_piece_36a = extrude(amount=6.75, mode=Mode.PRIVATE)
    fillet8_piece_36a = split(fillet8_piece_36a, bisect_by=Plane(origin=(-12.16, 2.885, 5), z_dir=(0, 0, -1)), keep=Keep.TOP, mode=Mode.PRIVATE)
    with BuildSketch(Plane(origin=(-12.16, 1.635, 5), x_dir=(0, 0, -1), z_dir=(0, 1, 0))) as fillet8_piece_36b_section:
        with BuildLine():
            CenterArc((FILLET8_R, -FILLET8_R), FILLET8_R, 90, 90)
            Line((0, -FILLET8_R), (0, 0))
            Line((0, 0), (FILLET8_R, 0))
        make_face()
    fillet8_piece_36b = extrude(amount=7.48, mode=Mode.PRIVATE)
    fillet8_piece_36b = split(fillet8_piece_36b, bisect_by=Plane(origin=(-12.16, 2.885, 5), z_dir=(0, -1, 0)), keep=Keep.TOP, mode=Mode.PRIVATE)
    fillet8_piece_36 = fillet8_piece_36a & fillet8_piece_36b
    add(fillet8_piece_36, mode=Mode.SUBTRACT)
    with BuildSketch(Plane(origin=(-12.16, 2.885, 5), x_dir=(0, 0, -1), z_dir=(0, 1, 0))) as fillet8_piece_37a_section:
        with BuildLine():
            CenterArc((FILLET8_R, -FILLET8_R), FILLET8_R, 90, 90)
            Line((0, -FILLET8_R), (0, 0))
            Line((0, 0), (FILLET8_R, 0))
        make_face()
    fillet8_piece_37a = extrude(amount=7.48, mode=Mode.PRIVATE)
    fillet8_piece_37a = split(fillet8_piece_37a, bisect_by=Plane(origin=(-12.16, 9.115, 5), z_dir=(0, 1, 0)), keep=Keep.TOP, mode=Mode.PRIVATE)
    with BuildSketch(Plane(origin=(-12.16, 9.115, 10.5), x_dir=(0, 1, 0), z_dir=(0, 0, -1))) as fillet8_piece_37b_section:
        with BuildLine():
            CenterArc((FILLET8_R, FILLET8_R), FILLET8_R, 180, 90)
            Line((0, FILLET8_R), (0, 0))
            Line((0, 0), (FILLET8_R, 0))
        make_face()
    fillet8_piece_37b = extrude(amount=6.75, mode=Mode.PRIVATE)
    fillet8_piece_37b = split(fillet8_piece_37b, bisect_by=Plane(origin=(-12.16, 9.115, 5), z_dir=(0, 0, -1)), keep=Keep.TOP, mode=Mode.PRIVATE)
    fillet8_piece_37 = fillet8_piece_37a & fillet8_piece_37b
    add(fillet8_piece_37, mode=Mode.SUBTRACT)


solid = part.part
